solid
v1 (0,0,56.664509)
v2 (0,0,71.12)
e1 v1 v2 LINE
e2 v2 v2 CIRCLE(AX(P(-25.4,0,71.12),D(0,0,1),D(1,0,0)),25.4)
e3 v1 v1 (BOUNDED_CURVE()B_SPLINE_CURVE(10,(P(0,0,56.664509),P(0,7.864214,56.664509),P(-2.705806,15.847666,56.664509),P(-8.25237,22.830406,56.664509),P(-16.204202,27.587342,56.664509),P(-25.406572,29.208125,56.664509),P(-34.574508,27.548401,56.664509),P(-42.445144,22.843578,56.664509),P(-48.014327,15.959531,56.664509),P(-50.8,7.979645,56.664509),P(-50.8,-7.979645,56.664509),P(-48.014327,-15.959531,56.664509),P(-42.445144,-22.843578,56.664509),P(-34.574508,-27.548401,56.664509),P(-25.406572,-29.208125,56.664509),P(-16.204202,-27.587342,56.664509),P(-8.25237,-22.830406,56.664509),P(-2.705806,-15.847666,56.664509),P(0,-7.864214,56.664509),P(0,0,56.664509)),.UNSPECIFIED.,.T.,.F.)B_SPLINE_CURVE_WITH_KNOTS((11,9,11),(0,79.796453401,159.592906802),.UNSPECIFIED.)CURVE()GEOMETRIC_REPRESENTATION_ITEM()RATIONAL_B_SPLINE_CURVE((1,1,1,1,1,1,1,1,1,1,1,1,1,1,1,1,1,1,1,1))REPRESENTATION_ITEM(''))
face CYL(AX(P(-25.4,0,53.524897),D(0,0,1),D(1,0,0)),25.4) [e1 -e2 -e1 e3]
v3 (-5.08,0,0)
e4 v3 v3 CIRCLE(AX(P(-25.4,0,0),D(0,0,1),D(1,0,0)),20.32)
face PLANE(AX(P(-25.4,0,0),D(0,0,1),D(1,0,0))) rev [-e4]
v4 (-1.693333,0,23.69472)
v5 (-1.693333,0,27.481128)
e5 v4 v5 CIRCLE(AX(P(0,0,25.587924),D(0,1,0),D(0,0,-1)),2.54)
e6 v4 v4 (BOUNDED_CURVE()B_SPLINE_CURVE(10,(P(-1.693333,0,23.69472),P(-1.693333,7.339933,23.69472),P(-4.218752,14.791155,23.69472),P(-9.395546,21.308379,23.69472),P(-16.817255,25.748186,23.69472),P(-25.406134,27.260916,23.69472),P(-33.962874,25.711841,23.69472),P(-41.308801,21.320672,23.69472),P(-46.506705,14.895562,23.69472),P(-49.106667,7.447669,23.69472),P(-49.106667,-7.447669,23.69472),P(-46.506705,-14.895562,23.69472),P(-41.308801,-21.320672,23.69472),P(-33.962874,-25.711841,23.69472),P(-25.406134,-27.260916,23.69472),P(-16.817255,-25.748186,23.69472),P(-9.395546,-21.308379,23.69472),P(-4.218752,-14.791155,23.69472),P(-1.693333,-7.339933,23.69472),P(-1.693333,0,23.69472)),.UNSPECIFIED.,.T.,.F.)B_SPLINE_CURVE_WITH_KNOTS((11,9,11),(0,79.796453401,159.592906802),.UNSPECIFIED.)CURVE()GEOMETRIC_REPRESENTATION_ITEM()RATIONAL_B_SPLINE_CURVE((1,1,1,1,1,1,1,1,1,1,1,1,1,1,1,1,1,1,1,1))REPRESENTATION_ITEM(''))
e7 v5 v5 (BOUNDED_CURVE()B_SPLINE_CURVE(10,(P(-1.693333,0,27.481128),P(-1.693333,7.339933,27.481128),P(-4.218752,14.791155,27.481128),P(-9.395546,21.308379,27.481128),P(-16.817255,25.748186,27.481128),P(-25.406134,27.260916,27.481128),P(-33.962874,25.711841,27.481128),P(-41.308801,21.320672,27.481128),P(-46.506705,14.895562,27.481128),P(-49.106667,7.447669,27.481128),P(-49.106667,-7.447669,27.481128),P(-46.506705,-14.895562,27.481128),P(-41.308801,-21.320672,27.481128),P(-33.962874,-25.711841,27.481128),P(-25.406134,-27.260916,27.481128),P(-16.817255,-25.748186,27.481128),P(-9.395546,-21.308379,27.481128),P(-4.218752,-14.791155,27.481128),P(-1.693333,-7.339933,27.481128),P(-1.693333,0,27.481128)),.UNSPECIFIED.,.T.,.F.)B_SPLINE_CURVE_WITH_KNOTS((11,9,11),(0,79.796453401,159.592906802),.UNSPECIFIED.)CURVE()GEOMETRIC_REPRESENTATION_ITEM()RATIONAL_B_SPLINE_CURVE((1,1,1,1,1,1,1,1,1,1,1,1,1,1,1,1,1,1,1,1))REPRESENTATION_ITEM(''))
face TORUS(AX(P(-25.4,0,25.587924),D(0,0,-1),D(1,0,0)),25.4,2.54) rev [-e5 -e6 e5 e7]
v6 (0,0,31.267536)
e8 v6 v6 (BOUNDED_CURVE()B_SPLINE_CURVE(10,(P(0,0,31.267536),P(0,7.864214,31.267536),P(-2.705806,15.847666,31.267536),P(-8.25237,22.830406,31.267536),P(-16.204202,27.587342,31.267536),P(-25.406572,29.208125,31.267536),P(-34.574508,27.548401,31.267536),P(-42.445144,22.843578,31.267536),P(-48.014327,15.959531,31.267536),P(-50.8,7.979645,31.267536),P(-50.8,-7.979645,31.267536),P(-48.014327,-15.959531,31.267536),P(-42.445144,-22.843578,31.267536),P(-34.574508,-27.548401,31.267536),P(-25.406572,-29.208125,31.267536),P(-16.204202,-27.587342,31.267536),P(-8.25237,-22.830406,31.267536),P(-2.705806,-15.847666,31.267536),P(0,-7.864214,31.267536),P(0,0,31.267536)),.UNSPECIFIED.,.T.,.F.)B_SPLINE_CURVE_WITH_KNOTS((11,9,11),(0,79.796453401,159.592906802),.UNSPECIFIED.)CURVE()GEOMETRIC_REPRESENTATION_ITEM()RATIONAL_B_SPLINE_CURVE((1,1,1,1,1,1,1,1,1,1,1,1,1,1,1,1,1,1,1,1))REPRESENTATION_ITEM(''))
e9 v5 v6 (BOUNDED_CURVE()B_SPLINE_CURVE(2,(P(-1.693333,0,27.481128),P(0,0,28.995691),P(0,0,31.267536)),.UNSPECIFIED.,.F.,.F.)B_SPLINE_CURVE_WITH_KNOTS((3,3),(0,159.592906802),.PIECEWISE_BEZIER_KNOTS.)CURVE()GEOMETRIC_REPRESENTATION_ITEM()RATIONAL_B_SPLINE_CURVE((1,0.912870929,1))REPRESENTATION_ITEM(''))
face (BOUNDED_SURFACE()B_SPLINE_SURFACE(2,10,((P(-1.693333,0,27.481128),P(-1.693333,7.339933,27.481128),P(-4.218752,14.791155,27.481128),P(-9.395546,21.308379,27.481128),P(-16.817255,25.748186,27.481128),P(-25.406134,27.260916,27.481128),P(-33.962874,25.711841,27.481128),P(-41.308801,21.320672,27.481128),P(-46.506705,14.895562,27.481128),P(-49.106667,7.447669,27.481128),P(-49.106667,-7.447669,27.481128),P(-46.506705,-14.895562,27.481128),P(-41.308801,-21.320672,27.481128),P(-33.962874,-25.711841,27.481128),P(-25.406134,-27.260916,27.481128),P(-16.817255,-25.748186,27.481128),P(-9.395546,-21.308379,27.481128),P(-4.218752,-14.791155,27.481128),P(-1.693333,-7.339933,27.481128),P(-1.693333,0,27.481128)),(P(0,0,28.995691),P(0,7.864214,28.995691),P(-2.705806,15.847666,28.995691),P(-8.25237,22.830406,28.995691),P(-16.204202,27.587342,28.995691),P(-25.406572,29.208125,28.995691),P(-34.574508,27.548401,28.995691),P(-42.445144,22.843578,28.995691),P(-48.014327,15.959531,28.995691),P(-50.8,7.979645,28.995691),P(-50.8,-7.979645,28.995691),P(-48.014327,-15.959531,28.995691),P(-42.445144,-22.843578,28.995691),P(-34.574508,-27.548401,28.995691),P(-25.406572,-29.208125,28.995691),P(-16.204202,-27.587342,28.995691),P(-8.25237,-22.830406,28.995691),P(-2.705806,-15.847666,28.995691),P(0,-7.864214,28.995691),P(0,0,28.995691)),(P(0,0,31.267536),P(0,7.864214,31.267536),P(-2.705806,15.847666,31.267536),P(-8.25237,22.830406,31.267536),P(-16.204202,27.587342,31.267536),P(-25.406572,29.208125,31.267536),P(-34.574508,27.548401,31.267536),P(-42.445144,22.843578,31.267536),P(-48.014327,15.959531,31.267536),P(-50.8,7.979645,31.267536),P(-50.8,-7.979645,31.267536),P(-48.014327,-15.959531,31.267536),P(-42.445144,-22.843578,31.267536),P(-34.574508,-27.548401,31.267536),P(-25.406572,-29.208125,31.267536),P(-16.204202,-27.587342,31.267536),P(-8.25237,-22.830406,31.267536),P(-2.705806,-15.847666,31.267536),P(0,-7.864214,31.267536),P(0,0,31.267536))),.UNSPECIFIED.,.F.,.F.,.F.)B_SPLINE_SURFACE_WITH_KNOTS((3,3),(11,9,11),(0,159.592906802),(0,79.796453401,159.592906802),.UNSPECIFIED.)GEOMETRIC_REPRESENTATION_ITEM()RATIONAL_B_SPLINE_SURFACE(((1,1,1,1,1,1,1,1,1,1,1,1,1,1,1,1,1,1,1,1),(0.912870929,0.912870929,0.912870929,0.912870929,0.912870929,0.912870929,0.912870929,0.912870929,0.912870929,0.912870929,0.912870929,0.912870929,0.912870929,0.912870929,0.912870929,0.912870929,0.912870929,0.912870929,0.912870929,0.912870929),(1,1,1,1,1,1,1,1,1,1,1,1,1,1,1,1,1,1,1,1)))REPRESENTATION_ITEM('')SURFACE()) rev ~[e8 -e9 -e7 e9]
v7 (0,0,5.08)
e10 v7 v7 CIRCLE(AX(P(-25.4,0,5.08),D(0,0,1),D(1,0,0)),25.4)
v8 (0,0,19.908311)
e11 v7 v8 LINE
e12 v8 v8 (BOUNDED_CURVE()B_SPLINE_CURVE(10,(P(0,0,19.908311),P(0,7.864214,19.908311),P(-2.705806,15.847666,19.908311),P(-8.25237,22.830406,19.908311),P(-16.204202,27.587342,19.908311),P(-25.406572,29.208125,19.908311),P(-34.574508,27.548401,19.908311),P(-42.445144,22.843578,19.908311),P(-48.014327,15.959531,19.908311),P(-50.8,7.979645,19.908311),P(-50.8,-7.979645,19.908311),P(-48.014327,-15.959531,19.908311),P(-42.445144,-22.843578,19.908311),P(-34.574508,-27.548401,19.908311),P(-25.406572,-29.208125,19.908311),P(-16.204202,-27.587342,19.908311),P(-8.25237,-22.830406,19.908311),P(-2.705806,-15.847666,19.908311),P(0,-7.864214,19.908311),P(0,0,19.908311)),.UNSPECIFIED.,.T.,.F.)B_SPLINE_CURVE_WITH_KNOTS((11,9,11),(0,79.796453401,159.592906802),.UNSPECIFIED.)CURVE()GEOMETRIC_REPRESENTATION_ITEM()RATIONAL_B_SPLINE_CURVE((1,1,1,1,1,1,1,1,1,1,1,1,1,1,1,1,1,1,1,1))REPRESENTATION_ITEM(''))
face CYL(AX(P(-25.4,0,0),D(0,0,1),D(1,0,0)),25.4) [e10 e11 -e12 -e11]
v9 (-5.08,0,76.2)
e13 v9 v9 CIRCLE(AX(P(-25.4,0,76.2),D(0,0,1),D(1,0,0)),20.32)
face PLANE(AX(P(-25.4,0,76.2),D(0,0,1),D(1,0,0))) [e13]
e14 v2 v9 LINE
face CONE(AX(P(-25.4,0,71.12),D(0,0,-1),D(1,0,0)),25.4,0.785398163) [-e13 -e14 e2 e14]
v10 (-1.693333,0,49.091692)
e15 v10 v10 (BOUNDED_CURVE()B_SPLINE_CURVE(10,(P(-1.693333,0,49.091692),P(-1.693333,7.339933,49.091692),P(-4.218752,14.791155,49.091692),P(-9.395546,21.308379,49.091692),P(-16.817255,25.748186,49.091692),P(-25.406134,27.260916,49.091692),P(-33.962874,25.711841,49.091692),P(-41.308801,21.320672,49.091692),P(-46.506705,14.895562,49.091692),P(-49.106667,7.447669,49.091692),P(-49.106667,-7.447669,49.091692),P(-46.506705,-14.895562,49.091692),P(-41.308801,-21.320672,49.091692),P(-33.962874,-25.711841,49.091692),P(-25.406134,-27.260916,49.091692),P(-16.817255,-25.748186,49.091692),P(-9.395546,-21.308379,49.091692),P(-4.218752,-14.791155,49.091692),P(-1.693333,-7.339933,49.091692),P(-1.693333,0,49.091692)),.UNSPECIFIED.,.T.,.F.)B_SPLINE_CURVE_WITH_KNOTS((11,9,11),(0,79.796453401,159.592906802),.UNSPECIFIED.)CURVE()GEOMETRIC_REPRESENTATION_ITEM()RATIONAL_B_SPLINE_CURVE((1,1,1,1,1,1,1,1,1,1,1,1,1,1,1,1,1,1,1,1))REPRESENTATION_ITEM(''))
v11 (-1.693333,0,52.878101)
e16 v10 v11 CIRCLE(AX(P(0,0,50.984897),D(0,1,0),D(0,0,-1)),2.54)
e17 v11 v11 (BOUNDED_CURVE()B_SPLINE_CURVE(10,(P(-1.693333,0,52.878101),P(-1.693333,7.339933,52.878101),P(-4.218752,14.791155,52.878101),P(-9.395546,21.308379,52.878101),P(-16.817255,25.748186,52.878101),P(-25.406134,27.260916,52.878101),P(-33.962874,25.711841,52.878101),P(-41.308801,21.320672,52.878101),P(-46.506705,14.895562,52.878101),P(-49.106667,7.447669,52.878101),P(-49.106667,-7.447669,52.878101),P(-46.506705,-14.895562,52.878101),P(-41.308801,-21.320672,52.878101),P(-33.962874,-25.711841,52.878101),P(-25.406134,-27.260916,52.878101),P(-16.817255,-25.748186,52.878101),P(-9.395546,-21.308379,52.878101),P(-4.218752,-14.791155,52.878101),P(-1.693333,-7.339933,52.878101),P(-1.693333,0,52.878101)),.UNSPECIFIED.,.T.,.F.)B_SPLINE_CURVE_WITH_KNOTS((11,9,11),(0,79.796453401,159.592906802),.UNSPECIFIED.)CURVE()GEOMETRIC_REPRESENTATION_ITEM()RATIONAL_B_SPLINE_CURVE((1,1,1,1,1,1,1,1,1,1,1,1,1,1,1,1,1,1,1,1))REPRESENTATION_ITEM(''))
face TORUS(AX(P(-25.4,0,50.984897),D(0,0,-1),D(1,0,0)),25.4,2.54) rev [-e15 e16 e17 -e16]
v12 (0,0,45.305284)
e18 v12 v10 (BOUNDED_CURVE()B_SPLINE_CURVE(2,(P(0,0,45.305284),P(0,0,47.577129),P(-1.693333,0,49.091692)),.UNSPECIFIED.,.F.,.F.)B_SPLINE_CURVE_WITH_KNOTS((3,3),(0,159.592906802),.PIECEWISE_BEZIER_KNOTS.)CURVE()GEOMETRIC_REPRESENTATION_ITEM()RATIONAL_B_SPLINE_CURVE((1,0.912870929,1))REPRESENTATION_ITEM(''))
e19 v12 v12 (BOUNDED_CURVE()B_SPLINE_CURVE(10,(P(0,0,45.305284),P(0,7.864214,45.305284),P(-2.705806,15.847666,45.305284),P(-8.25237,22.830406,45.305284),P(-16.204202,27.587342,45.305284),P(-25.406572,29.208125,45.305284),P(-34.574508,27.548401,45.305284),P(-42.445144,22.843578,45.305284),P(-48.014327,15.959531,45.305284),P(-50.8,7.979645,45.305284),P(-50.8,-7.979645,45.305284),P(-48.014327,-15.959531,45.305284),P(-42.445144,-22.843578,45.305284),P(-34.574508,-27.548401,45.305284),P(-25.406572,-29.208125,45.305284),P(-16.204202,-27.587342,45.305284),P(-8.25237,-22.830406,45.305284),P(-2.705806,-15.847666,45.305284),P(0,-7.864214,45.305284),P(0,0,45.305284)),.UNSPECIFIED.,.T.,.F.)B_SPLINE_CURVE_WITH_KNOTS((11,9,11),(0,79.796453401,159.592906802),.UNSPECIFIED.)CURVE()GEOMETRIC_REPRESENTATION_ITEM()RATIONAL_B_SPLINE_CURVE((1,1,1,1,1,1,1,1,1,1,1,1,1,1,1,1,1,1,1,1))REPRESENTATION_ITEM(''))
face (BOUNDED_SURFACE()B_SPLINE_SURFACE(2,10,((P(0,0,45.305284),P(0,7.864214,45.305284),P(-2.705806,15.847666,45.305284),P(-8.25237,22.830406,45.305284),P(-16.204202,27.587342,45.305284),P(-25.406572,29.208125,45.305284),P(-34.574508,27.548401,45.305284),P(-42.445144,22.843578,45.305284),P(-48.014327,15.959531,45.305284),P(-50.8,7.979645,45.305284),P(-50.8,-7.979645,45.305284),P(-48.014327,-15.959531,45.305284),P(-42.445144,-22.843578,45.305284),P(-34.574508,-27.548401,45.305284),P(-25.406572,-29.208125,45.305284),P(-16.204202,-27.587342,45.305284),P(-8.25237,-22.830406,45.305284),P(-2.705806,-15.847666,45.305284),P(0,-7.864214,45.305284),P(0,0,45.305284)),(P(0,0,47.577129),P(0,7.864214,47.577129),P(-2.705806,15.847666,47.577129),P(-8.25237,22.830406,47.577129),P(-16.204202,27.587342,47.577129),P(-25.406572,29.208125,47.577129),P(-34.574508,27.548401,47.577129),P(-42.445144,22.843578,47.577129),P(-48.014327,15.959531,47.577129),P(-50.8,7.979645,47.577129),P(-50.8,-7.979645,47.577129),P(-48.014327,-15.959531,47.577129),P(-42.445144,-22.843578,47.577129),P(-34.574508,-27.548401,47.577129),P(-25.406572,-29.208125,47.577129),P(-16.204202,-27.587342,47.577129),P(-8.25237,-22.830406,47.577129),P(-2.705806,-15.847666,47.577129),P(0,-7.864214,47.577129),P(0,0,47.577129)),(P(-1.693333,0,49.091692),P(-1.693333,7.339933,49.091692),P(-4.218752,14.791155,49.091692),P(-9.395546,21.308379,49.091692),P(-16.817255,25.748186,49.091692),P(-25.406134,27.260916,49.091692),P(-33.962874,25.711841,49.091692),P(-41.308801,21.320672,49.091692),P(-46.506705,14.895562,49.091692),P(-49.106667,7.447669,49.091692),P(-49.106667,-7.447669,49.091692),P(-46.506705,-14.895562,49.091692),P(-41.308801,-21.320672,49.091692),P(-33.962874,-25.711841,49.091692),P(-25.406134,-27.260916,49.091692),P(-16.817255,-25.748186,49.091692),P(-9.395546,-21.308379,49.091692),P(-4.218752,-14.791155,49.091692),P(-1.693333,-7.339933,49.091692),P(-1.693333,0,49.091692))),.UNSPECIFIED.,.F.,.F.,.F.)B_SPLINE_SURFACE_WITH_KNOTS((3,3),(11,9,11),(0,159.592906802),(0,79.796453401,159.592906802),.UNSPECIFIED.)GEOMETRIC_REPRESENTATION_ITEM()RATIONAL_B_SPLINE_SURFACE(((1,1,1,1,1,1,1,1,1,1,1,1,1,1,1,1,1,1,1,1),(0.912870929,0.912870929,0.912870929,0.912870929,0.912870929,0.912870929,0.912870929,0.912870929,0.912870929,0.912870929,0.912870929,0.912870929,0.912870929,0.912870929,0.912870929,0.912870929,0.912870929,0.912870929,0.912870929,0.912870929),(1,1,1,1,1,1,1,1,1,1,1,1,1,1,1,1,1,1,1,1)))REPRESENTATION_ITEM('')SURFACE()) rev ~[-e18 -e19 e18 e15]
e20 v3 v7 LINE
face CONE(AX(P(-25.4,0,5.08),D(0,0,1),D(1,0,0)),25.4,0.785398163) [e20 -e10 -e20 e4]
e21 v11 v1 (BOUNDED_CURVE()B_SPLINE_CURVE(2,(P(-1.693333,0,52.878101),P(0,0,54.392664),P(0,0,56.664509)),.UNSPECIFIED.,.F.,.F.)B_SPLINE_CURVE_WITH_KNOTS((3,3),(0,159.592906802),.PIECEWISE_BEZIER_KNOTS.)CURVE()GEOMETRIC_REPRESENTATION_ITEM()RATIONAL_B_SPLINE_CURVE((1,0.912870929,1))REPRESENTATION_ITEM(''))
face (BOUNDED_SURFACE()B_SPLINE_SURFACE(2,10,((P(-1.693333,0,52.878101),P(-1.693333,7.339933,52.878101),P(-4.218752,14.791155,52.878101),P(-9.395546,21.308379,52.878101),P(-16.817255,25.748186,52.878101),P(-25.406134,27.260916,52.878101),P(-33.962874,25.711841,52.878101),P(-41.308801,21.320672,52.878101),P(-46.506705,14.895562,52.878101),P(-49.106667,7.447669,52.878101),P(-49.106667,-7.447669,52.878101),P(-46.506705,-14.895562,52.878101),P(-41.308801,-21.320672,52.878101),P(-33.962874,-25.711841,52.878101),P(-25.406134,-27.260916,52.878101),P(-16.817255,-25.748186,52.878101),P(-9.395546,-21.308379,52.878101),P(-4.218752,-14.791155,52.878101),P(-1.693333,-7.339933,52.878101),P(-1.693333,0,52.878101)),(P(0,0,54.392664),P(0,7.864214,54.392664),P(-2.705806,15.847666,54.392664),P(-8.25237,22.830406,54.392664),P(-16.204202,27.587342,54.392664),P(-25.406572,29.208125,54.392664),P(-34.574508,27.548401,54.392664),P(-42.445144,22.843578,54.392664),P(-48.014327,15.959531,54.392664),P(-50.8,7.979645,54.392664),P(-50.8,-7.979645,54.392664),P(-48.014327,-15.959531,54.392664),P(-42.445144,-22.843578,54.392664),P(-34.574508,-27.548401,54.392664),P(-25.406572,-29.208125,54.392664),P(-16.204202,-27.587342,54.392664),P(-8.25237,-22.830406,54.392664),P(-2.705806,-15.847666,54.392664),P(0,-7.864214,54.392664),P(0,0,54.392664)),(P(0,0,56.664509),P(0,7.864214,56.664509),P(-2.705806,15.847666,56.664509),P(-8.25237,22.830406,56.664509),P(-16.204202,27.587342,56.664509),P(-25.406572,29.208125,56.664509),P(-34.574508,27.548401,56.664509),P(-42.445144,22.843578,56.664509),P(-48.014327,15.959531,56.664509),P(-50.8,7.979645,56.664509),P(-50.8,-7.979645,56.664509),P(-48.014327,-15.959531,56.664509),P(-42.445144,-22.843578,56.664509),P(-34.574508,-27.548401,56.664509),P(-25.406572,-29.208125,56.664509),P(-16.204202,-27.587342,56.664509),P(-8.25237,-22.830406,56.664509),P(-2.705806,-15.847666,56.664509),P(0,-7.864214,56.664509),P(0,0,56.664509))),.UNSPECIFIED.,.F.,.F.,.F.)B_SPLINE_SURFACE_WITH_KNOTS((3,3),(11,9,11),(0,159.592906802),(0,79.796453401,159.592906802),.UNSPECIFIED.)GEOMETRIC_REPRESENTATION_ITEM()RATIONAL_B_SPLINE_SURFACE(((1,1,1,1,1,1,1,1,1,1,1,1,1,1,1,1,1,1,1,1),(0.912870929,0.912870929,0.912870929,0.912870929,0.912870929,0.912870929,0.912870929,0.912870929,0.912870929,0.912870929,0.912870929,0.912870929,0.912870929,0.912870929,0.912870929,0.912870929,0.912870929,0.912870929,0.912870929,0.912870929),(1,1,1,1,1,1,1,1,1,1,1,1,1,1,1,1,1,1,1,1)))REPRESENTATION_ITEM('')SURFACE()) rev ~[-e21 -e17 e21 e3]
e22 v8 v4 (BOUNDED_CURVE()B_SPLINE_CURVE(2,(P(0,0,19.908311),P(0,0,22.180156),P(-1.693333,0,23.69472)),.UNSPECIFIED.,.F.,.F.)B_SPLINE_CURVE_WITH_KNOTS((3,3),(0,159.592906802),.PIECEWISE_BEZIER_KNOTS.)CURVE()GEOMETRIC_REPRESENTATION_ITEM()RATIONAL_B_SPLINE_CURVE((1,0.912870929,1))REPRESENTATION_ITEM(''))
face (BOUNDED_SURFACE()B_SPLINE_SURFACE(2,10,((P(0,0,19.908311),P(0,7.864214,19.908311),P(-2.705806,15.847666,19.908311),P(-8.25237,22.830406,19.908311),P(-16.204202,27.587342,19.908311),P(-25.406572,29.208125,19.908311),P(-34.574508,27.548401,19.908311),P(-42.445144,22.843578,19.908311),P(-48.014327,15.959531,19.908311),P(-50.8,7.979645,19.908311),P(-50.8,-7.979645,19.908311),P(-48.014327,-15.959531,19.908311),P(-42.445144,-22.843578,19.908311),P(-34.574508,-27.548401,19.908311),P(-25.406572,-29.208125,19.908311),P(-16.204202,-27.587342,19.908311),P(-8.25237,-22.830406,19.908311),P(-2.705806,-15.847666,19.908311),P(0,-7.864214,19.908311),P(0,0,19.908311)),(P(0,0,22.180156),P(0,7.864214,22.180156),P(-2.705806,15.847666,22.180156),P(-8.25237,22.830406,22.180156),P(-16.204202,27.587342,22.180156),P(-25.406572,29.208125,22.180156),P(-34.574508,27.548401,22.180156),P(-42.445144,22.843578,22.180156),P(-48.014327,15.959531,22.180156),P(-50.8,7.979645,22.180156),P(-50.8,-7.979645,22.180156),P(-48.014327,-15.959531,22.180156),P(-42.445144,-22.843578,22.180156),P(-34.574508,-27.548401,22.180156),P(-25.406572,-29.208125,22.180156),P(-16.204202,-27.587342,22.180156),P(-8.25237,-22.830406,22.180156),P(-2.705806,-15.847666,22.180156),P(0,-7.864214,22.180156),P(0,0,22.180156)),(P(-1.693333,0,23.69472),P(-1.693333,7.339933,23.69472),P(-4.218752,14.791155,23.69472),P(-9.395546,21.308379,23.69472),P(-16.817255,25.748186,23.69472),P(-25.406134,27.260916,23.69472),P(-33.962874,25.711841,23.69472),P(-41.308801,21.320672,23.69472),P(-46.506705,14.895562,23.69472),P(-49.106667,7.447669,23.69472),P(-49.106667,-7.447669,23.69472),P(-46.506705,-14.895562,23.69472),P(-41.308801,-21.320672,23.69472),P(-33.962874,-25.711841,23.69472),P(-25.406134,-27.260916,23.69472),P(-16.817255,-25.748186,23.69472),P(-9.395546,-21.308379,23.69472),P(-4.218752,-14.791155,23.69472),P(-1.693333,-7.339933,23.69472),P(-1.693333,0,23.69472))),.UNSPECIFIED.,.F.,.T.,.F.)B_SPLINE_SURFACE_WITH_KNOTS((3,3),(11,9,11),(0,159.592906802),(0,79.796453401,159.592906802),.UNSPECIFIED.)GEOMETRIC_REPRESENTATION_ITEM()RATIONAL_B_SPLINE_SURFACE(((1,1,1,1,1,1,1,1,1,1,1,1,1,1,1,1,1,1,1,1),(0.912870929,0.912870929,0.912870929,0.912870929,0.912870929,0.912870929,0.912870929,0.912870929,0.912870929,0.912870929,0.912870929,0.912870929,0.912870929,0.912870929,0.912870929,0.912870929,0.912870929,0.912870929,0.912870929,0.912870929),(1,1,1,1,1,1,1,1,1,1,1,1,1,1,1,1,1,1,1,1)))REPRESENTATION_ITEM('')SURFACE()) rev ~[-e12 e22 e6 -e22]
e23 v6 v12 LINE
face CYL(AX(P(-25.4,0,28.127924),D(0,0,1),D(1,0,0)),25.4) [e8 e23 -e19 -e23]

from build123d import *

# Parameters (mm, degrees)
F2_SIZE = 5.08
F3_R    = 5.08


with BuildPart() as f1:
    # F0 (on Front) → F1 (revolve)
    with BuildSketch(Plane.XZ):
        with BuildLine():
            Line((-25.4, 0), (0, 0))
            Line((0, 0), (0, 23.0479238248))
            ThreePointArc((0, 23.0479238248), (-2.54, 25.5879238248), (0, 28.1279238248))
            Line((0, 28.1279238248), (0, 48.4448967195))
            ThreePointArc((0, 48.4448967195), (-2.54, 50.9848967195), (0, 53.5248967195))
            Line((0, 53.5248967195), (0, 76.2))
            Line((0, 76.2), (-25.4, 76.2))
            Line((-25.4, 76.2), (-25.4, 0))
        make_face()
    revolve(axis=Axis((-25.4, 0, 38.1), (0, 0, 1)))

    # F2
    f2_edges = [f1.edges().sort_by_distance(p)[0] for p in [
        (-50.8, 0, 76.2),
        (-50.8, 0, 0),
    ]]
    chamfer(f2_edges, length=F2_SIZE)

    # F3
    f3_edges = [f1.edges().sort_by_distance(p)[0] for p in [
        (-50.8, 0, 53.524897),
        (-50.8, 0, 28.127924),
        (-50.8, 0, 23.047924),
        (-50.8, 0, 48.444897),
    ]]
    fillet(f3_edges, radius=F3_R)


solid = f1.part
